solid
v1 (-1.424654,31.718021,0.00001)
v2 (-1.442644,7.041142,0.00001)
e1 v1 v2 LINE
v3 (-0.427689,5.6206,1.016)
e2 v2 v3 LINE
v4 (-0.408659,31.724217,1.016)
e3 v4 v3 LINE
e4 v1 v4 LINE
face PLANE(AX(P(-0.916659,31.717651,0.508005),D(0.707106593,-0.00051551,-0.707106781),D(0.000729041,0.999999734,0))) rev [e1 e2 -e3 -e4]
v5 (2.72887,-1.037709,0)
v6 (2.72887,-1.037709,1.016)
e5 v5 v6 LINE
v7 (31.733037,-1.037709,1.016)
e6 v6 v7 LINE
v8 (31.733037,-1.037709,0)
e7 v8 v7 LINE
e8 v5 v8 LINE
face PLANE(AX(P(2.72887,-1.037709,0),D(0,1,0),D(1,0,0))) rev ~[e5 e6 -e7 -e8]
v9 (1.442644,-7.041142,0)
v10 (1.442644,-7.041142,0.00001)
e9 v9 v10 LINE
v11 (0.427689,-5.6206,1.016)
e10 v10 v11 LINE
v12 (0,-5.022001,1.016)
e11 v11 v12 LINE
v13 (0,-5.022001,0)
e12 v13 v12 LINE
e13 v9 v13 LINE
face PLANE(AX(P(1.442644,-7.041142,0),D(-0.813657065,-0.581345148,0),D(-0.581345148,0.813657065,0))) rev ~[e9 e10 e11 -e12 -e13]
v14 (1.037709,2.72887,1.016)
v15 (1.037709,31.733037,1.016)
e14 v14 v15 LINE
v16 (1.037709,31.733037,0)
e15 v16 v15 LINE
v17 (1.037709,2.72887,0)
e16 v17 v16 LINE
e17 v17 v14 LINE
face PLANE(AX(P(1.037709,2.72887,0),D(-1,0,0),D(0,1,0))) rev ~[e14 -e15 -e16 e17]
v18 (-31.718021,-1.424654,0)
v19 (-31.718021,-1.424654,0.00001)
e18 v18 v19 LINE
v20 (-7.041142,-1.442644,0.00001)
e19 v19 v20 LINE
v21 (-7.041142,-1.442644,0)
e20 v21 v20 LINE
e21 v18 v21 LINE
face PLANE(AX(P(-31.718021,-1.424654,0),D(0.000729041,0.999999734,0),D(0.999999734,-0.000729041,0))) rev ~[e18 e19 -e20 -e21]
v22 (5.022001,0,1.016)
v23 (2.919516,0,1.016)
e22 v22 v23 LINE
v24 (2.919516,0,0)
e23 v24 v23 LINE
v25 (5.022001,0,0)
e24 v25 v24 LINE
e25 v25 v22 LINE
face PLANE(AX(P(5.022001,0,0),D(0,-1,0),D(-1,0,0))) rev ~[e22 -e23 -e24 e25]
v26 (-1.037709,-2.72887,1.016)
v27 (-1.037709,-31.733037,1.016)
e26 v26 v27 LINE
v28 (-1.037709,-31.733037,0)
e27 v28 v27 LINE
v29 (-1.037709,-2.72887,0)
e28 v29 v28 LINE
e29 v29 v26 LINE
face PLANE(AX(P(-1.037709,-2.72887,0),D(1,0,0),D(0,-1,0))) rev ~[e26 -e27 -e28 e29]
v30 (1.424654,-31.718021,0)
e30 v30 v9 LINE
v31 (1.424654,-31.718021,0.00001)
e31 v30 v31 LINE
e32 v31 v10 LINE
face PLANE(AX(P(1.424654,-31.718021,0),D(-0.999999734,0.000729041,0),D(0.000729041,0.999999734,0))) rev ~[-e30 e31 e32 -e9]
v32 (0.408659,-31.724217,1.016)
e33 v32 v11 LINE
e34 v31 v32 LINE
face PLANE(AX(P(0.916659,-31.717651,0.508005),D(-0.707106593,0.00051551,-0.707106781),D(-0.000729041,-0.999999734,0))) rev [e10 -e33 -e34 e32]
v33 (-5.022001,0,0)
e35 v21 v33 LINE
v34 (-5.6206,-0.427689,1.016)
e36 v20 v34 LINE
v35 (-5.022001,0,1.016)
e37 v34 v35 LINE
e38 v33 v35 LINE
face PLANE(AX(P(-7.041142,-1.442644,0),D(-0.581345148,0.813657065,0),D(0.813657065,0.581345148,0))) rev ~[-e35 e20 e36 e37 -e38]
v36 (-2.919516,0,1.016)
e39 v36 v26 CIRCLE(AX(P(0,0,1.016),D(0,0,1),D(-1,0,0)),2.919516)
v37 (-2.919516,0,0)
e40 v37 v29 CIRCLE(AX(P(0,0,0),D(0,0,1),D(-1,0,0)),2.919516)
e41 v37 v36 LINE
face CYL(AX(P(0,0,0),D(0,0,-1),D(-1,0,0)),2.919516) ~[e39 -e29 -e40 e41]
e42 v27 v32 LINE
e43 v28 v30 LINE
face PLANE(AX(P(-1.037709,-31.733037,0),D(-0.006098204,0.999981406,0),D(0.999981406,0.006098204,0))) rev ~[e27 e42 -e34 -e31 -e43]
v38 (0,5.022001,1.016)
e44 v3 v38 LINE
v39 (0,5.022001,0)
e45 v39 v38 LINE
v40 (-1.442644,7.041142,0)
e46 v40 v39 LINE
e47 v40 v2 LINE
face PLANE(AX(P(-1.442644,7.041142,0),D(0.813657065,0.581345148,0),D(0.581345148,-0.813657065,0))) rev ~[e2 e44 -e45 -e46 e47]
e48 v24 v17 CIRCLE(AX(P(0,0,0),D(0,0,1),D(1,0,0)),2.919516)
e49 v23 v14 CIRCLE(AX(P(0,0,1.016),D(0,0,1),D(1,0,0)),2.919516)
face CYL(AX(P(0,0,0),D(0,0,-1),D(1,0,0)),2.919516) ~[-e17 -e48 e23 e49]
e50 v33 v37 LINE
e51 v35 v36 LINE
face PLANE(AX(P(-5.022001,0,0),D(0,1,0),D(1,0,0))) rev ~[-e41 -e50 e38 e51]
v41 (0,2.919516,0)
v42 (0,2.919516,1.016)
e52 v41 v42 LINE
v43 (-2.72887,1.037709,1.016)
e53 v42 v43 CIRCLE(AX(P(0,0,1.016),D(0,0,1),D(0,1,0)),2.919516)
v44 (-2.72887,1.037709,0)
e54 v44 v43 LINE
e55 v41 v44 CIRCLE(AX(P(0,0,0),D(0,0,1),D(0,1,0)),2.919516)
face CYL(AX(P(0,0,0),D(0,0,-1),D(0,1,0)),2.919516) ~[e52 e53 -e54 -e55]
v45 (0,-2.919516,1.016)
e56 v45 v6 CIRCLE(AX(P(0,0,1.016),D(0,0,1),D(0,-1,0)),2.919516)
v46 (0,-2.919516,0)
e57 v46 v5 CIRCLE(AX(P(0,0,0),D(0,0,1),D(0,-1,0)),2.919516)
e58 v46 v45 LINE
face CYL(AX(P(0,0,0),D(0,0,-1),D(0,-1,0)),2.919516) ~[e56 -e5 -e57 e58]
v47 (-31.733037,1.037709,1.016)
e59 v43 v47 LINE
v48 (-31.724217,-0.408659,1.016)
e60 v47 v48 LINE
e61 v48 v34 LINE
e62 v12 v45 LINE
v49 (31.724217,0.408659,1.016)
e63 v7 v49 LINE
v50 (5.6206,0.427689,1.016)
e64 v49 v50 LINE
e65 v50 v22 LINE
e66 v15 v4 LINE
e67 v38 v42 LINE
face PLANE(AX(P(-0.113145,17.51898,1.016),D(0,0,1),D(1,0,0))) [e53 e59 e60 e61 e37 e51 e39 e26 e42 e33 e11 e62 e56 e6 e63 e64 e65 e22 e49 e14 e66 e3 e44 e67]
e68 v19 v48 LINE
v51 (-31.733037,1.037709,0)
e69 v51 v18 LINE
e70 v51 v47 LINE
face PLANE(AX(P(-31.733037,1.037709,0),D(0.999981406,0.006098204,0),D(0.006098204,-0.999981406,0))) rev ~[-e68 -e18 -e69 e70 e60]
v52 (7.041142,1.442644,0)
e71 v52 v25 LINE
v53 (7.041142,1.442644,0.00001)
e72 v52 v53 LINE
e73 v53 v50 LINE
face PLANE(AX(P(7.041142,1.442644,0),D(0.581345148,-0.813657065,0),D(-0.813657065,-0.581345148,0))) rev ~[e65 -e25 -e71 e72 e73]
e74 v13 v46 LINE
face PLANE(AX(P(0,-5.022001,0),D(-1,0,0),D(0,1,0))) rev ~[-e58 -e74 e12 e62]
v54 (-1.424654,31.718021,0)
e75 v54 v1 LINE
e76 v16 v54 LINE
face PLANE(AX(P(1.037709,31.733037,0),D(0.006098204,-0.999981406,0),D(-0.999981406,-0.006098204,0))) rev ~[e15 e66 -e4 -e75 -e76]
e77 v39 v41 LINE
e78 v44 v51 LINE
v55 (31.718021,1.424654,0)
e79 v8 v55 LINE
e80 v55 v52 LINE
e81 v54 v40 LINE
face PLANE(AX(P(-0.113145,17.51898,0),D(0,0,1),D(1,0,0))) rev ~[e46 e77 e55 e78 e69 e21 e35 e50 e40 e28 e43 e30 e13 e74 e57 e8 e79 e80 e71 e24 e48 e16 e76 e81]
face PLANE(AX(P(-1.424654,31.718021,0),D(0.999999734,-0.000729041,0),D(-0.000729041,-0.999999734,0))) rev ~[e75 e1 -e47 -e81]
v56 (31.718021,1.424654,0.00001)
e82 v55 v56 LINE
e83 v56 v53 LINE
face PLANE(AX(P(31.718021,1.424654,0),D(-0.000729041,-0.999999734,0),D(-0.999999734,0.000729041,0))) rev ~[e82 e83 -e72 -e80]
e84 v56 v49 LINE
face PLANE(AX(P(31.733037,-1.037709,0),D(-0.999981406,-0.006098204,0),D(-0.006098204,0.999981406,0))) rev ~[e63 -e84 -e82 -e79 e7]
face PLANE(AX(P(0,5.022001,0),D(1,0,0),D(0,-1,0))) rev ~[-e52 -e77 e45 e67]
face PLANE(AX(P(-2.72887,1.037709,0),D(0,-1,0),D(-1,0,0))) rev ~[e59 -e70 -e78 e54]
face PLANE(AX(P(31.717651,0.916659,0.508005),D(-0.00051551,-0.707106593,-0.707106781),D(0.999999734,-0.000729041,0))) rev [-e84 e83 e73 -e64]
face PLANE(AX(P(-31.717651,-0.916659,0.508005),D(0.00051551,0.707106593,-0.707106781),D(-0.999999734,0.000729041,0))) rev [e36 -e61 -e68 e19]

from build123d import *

# Parameters (mm, degrees)
F1_DEPTH = 1.016
F2_SIZE  = 1.01599


# Not quite as in the source:
# - a fillet or chamfer is up to 0.001 mm smaller than in the source, because OpenCascade refuses the exact size


with BuildPart() as f1:
    # F0 (on Top) → F1 (new body)
    with BuildSketch(Plane.XY):
        with BuildLine():
            ThreePointArc((0, 2.9195159057), (0.527538065, 2.8714589869), (1.0377089673, 2.7288703199))
            Line((1.0377089673, 2.7288703199), (1.0377089673, 31.7330373601))
            Line((1.0377089673, 31.7330373601), (-1.4246536514, 31.7180210917))
            Line((-1.4246536514, 31.7180210917), (-1.4426441077, 7.0411415527))
            Line((-1.4426441077, 7.0411415527), (0, 5.0220009871))
            Line((0, 5.0220009871), (0, 2.9195159057))
        make_face()
        with BuildLine():
            Line((1.0377089673, 1.7452047762), (1.0377089673, 2.7288703199))
            ThreePointArc((1.0377089673, 2.7288703199), (0.527538065, 2.8714589869), (0, 2.9195159057))
            Line((0, 2.9195159057), (1.0377089673, 1.7452047762))
        make_face()
        with BuildLine():
            Line((1.7452047762, -1.0377089673), (2.9195159057, 0))
            ThreePointArc((2.9195159057, 0), (2.4034538646, 1.6574023784), (1.0377089673, 2.7288703199))
            Line((1.0377089673, 2.7288703199), (1.0377089673, 1.7452047762))
            Line((1.0377089673, 1.7452047762), (0, 2.9195159057))
            ThreePointArc((0, 2.9195159057), (-1.6574023784, 2.4034538646), (-2.7288703199, 1.0377089673))
            Line((-2.7288703199, 1.0377089673), (-1.7452047762, 1.0377089673))
            Line((-1.7452047762, 1.0377089673), (-2.9195159057, 0))
            ThreePointArc((-2.9195159057, 0), (-2.4034538646, -1.6574023784), (-1.0377089673, -2.7288703199))
            Line((-1.0377089673, -2.7288703199), (-1.0377089673, -1.7452047762))
            Line((-1.0377089673, -1.7452047762), (0, -2.9195159057))
            ThreePointArc((0, -2.9195159057), (1.6574023784, -2.4034538646), (2.7288703199, -1.0377089673))
            Line((2.7288703199, -1.0377089673), (1.7452047762, -1.0377089673))
        make_face()
        with BuildLine():
            Line((-1.7452047762, 1.0377089673), (-2.7288703199, 1.0377089673))
            ThreePointArc((-2.7288703199, 1.0377089673), (-2.8714589869, 0.527538065), (-2.9195159057, 0))
            Line((-2.9195159057, 0), (-1.7452047762, 1.0377089673))
        make_face()
        with BuildLine():
            ThreePointArc((2.7288703199, -1.0377089673), (2.8714589869, -0.527538065), (2.9195159057, 0))
            Line((2.9195159057, 0), (1.7452047762, -1.0377089673))
            Line((1.7452047762, -1.0377089673), (2.7288703199, -1.0377089673))
        make_face()
        with BuildLine():
            Line((5.0220009871, 0), (2.9195159057, 0))
            ThreePointArc((2.9195159057, 0), (2.8714589869, -0.527538065), (2.7288703199, -1.0377089673))
            Line((2.7288703199, -1.0377089673), (31.7330373601, -1.0377089673))
            Line((31.7330373601, -1.0377089673), (31.7180210917, 1.4246536514))
            Line((31.7180210917, 1.4246536514), (7.0411415527, 1.4426441077))
            Line((7.0411415527, 1.4426441077), (5.0220009871, 0))
        make_face()
        with BuildLine():
            ThreePointArc((-1.0377089673, -2.7288703199), (-0.527538065, -2.8714589869), (0, -2.9195159057))
            Line((0, -2.9195159057), (-1.0377089673, -1.7452047762))
            Line((-1.0377089673, -1.7452047762), (-1.0377089673, -2.7288703199))
        make_face()
        with BuildLine():
            Line((0, -5.0220009871), (0, -2.9195159057))
            ThreePointArc((0, -2.9195159057), (-0.527538065, -2.8714589869), (-1.0377089673, -2.7288703199))
            Line((-1.0377089673, -2.7288703199), (-1.0377089673, -31.7330373601))
            Line((-1.0377089673, -31.7330373601), (1.4246536514, -31.7180210917))
            Line((1.4246536514, -31.7180210917), (1.4426441077, -7.0411415527))
            Line((1.4426441077, -7.0411415527), (0, -5.0220009871))
        make_face()
        with BuildLine():
            ThreePointArc((-2.9195159057, 0), (-2.8714589869, 0.527538065), (-2.7288703199, 1.0377089673))
            Line((-2.7288703199, 1.0377089673), (-31.7330373601, 1.0377089673))
            Line((-31.7330373601, 1.0377089673), (-31.7180210917, -1.4246536514))
            Line((-31.7180210917, -1.4246536514), (-7.0411415527, -1.4426441077))
            Line((-7.0411415527, -1.4426441077), (-5.0220009871, 0))
            Line((-5.0220009871, 0), (-2.9195159057, 0))
        make_face()
    extrude(amount=F1_DEPTH)

    # F2 (size 1.016 in the source; OpenCascade refuses exactly that, so slightly less here)
    f2_edges = [f1.edges().sort_by_distance(p)[0] for p in [
        (-19.379581, -1.433649, 1.016),
        (1.433649, -19.379581, 1.016),
        (19.379581, 1.433649, 1.016),
        (-1.433649, 19.379581, 1.016),
    ]]
    chamfer(f2_edges, length=F2_SIZE)


solid = f1.part
